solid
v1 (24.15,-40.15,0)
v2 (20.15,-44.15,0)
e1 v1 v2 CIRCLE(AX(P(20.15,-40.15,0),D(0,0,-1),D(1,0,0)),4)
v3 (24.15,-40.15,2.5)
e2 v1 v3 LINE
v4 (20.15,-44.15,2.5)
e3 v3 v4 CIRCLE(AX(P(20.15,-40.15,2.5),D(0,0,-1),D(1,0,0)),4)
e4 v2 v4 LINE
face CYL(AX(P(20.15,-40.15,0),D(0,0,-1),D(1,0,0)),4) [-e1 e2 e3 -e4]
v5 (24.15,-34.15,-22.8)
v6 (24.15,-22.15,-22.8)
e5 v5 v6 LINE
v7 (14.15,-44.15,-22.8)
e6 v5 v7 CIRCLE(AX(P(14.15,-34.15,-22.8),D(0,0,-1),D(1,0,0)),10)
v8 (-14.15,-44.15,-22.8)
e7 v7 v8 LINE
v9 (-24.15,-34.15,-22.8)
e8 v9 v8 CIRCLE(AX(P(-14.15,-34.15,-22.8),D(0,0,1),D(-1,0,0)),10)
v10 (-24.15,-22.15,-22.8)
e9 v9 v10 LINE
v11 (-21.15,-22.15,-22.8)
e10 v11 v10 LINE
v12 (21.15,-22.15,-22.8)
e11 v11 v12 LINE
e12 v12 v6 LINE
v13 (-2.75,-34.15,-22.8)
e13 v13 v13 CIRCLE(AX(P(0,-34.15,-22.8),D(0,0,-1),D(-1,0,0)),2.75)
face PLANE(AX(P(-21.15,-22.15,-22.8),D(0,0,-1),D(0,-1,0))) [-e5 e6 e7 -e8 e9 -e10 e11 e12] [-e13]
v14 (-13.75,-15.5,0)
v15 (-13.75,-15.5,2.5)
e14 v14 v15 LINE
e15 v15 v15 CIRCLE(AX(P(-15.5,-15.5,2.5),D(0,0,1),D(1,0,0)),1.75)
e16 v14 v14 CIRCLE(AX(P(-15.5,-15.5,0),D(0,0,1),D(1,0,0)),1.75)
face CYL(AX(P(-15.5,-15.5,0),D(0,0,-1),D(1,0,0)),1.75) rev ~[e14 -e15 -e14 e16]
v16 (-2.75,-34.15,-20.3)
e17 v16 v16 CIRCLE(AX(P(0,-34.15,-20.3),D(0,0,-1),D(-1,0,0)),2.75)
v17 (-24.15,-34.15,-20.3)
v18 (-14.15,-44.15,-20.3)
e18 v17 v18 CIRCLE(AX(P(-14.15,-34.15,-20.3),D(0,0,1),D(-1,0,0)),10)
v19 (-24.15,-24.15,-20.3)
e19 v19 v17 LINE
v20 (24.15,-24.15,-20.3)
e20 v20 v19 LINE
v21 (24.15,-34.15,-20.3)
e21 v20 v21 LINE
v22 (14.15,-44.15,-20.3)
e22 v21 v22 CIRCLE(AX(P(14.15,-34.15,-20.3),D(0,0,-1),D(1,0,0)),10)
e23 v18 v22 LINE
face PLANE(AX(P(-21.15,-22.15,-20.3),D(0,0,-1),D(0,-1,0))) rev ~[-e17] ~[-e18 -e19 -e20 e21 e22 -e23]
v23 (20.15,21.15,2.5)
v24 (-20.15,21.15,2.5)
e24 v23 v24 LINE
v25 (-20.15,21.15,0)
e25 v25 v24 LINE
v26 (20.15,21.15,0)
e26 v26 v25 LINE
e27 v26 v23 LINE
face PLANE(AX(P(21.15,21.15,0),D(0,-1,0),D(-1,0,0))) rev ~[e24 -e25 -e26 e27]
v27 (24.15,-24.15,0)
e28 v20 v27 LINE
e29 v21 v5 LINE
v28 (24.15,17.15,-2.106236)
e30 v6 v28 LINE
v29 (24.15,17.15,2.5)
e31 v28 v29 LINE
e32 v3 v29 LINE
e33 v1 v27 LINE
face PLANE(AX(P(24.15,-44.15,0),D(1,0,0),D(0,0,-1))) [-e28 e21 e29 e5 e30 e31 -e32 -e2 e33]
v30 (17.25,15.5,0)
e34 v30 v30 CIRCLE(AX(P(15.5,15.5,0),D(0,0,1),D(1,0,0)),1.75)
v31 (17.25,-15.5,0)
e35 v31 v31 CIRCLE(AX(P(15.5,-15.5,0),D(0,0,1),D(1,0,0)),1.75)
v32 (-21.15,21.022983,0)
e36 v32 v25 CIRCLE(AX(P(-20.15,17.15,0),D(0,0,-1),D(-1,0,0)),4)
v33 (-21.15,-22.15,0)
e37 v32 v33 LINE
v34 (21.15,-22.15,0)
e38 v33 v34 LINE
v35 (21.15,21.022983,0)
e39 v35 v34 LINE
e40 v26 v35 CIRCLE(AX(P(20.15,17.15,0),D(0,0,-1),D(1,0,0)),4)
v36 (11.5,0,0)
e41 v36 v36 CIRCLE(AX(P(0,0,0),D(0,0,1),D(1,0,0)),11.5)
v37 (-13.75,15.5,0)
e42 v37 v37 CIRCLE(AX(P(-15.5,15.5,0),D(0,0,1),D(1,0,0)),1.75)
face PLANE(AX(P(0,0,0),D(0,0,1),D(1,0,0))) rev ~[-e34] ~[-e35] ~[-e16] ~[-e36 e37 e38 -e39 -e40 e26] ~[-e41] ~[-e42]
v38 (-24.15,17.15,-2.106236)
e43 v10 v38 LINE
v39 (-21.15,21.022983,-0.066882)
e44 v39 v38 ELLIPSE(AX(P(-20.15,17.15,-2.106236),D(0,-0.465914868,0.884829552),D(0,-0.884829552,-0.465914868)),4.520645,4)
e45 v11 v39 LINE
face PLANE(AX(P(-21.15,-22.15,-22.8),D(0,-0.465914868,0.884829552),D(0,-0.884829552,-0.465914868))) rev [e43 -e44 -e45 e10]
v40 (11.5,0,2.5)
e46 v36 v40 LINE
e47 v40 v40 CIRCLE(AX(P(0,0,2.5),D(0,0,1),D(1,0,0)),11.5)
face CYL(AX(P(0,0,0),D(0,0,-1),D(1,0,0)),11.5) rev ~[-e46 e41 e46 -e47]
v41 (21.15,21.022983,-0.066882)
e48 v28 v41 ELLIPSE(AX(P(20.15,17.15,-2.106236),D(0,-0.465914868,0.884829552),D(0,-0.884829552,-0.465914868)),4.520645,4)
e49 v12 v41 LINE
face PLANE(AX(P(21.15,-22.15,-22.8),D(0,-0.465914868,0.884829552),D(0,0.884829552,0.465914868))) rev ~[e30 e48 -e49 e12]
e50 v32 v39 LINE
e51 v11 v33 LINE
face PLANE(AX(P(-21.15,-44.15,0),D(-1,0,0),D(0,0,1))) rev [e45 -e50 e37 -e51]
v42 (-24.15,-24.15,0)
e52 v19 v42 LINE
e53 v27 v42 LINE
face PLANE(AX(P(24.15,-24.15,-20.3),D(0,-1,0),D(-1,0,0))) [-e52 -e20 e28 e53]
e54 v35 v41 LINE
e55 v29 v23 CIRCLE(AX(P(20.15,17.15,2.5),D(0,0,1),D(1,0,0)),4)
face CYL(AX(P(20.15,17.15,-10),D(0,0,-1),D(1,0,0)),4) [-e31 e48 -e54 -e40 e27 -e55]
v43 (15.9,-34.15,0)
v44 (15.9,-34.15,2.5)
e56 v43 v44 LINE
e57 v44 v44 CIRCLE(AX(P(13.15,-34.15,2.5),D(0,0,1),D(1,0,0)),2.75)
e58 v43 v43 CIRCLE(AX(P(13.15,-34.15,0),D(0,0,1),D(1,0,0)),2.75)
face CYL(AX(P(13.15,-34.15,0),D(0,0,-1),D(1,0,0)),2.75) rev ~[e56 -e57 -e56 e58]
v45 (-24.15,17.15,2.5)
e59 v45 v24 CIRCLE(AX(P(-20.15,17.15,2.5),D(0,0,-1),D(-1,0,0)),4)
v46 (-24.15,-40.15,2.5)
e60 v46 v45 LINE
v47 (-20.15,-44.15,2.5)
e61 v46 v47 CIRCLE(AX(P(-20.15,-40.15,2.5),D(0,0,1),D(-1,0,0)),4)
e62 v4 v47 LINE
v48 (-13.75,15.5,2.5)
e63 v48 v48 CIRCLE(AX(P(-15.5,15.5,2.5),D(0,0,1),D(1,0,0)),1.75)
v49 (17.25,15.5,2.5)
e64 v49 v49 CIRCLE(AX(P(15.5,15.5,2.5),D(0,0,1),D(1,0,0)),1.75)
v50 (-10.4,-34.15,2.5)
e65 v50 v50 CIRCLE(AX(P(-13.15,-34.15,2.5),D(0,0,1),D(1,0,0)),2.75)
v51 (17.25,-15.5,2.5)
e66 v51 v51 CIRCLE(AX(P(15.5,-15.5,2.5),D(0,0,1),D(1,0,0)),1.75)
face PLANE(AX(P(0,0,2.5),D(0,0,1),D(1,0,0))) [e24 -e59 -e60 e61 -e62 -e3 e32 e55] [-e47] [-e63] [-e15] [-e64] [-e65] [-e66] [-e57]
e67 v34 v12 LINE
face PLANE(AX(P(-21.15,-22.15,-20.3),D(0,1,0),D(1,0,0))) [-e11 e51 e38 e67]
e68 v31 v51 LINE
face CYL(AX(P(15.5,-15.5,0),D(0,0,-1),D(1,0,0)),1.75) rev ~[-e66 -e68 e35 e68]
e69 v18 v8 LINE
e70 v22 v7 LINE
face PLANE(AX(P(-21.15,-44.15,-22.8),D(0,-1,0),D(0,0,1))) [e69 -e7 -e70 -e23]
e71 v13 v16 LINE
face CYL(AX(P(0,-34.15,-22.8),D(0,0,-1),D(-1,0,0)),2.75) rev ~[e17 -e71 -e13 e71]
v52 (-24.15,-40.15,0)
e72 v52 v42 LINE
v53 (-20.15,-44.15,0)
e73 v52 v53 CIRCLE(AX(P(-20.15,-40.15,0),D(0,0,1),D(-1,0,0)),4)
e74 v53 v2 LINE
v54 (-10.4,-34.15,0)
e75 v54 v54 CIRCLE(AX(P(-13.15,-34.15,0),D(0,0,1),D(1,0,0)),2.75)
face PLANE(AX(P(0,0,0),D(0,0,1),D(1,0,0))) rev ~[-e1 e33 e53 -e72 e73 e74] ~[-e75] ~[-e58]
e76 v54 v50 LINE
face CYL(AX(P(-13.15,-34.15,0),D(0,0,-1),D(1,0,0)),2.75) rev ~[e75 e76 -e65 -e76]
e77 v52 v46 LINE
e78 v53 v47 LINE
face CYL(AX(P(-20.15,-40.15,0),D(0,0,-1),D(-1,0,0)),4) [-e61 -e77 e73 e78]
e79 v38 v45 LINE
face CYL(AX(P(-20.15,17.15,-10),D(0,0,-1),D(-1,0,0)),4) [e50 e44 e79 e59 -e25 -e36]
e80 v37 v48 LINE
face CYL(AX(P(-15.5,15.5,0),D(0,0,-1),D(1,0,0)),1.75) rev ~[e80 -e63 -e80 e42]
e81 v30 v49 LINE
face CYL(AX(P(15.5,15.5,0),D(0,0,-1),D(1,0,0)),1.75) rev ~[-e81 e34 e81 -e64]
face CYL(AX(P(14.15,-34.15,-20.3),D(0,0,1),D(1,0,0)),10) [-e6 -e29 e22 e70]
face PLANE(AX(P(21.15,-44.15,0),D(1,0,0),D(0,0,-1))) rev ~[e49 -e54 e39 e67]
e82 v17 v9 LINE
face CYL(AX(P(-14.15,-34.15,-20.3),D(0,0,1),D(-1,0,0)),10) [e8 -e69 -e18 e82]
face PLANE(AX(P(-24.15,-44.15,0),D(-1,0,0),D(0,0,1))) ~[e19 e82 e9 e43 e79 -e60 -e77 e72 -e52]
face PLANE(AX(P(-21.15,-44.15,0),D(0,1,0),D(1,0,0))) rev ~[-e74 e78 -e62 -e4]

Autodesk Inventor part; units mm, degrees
ref_plane "YZ Plane" through (0, 0, 0) normal (1, 0, 0) x (0, 1, 0)
ref_plane "XZ Plane" through (0, 0, 0) normal (0, 1, 0) x (-1, 0, 0)
ref_plane "XY Plane" through (0, 0, 0) normal (0, 0, 1) x (1, 0, 0)
sketch "Sketch1" plane through (0, 0, 0) normal (0, 0, 1) x (1, 0, 0)
  line L0 (-21.15, -21.15) -> (21.15, -21.15) construction
  line L1 (21.15, -21.15) -> (21.15, 21.15)
  line L2 (21.15, 21.15) -> (-21.15, 21.15)
  line L3 (-21.15, 21.15) -> (-21.15, -21.15)
  line L4 (-21.15, -21.15) -> (21.15, 21.15) construction
  line L5 (21.15, -21.15) -> (-21.15, 21.15) construction
  line L6 (15.5, 15.5) -> (-15.5, 15.5) construction
  line L7 (-15.5, 15.5) -> (-15.5, -15.5) construction
  line L8 (-15.5, -15.5) -> (15.5, -15.5) construction
  line L9 (15.5, -15.5) -> (15.5, 15.5) construction
  line L10 (15.5, 15.5) -> (-15.5, -15.5) construction
  line L11 (-15.5, 15.5) -> (15.5, -15.5) construction
  line L12 (-21.15, -21.15) -> (-21.15, -44.15)
  line L13 (-21.15, -44.15) -> (21.15, -44.15)
  line L14 (21.15, -44.15) -> (21.15, -21.15)
  line L15 (21.15, -34.15) -> (-21.15, -34.15) construction
  circle A0 centre (-13.15, -34.15) radius 2.75
  circle A1 centre (13.15, -34.15) radius 2.75
  circle A2 centre (0, 0) radius 11.5
  circle A3 centre (-15.5, -15.5) radius 1.75
  circle A4 centre (15.5, -15.5) radius 1.75
  circle A5 centre (-15.5, 15.5) radius 1.75
  circle A6 centre (15.5, 15.5) radius 1.75
  dimension "d0" = 42.3
  dimension "d1" = 42.3
  dimension "d2" = 10
  dimension "d3" = 23
  dimension "d4" = 8
  dimension "d5" = 8
  dimension "d6" = 5.5
  dimension "d7" = 31
  dimension "d8" = 3.5
  dimension "d9" = 23
extrude "Extrusion1" add sketch "Sketch1" along normal blind 2.5
sketch "Sketch2" plane through (21.15, -44.15, 0) normal (1, 0, 0) x (0, 0, -1)
  line L0 (0, 0) -> (-2.5, 0) construction
  line L1 (0, 65.3) -> (-2.5, 65.3) construction
  line L2 (-2.5, 0) -> (-2.5, 65.3) construction
  line L3 (-2.5, 65.3) -> (0, 65.3) construction
  line L4 (0, 65.3) -> (20.3, 22) construction
  line L5 (20.3, 22) -> (20.3, 0)
  line L6 (20.3, 0) -> (-2.5, 0) construction
  line L7 (20.3, 22) -> (0, 22)
  line L8 (0, 22) -> (0, 65.3)
  line L9 (20.3, 0) -> (22.8, 0)
  line L10 (22.8, 0) -> (22.8, 22)
  line L11 (0, 0) -> (0, 65.3) projected
  line L12 (22.8, 22) -> (0, 65.3)
  line L13 (20.3, 22) -> (22.8, 22) construction
  line L14 (0, 0) -> (0, 65.3) projected
  line L15 (0, 65.3) -> (-2.5, 65.3) projected
  line L16 (-2.5, 0) -> (-2.5, 65.3) projected
  line L17 (0, 0) -> (-2.5, 0) projected
  point P0 (0, 44.15)
  point P1 (0, 65.3)
  dimension "d12" = 22
  dimension "d14" = 2.5
  dimension "d28" = 20.3
extrude "Extrusion2" add sketch "Sketch2" along normal blind 3
mirror "Mirror1" about plane through (0, 0, 0) normal (1, 0, 0) of "Extrusion2"
sketch "Sketch3" plane through (-21.15, -44.15, -20.3) normal (1, 0, 0) x (0, 0, -1)
  line L0 (0, 22) -> (0, 0) projected
  line L1 (0, 22) -> (2.5, 22)
  line L2 (2.5, 22) -> (2.5, 0)
  line L3 (2.5, 0) -> (0, 0)
  line L4 (0, 0) -> (0, 22)
  point P0 (-20.3, 44.15)
extrude "Extrusion3" add sketch "Sketch3" along normal up to surface (42.3 mm away)
sketch "Sketch4" plane through (24.15, -44.15, -20.3) normal (0, 0, 1) x (1, 0, 0)
  line L0 (-45.3, 22) -> (-48.3, 22) projected
  line L1 (0, 22) -> (0, 0) projected
  line L2 (-48.3, 22) -> (0, 22)
  line L3 (0, 22) -> (0, 20)
  line L4 (0, 20) -> (-48.3, 20)
  line L5 (-48.3, 20) -> (-48.3, 22)
  point P0 (-24.15, 44.15)
  point P1 (0, 22)
  dimension "d19" = 2
extrude "Extrusion4" add sketch "Sketch4" along normal up to surface (20.3 mm away)
sketch "Sketch5" plane through (24.15, -44.15, -22.8) normal (0, 0, -1) x (-1, 0, 0)
  line L0 (48.3, 0) -> (0, 0) projected
  line L1 (24.15, 0) -> (24.15, 10) construction
  circle A0 centre (24.15, 10) radius 2.75
  point P0 (24.15, 44.15)
  dimension "d22" = 5.5
  dimension "d23" = 10
extrude "Extrusion5" cut sketch "Sketch5" against normal up to surface (2.5 mm away)
fillet "Fillet1" radius 10 2 edges at (24.15, -44.15, -21.55) (-24.15, -44.15, -21.55)
fillet "Fillet1" radius 4 4 edges at (-24.15, -44.15, 1.25) (24.15, -44.15, 1.25) (24.15, 21.15, 1.25) (-24.15, 21.15, 1.25)
properties part number "MotorBracket1"
